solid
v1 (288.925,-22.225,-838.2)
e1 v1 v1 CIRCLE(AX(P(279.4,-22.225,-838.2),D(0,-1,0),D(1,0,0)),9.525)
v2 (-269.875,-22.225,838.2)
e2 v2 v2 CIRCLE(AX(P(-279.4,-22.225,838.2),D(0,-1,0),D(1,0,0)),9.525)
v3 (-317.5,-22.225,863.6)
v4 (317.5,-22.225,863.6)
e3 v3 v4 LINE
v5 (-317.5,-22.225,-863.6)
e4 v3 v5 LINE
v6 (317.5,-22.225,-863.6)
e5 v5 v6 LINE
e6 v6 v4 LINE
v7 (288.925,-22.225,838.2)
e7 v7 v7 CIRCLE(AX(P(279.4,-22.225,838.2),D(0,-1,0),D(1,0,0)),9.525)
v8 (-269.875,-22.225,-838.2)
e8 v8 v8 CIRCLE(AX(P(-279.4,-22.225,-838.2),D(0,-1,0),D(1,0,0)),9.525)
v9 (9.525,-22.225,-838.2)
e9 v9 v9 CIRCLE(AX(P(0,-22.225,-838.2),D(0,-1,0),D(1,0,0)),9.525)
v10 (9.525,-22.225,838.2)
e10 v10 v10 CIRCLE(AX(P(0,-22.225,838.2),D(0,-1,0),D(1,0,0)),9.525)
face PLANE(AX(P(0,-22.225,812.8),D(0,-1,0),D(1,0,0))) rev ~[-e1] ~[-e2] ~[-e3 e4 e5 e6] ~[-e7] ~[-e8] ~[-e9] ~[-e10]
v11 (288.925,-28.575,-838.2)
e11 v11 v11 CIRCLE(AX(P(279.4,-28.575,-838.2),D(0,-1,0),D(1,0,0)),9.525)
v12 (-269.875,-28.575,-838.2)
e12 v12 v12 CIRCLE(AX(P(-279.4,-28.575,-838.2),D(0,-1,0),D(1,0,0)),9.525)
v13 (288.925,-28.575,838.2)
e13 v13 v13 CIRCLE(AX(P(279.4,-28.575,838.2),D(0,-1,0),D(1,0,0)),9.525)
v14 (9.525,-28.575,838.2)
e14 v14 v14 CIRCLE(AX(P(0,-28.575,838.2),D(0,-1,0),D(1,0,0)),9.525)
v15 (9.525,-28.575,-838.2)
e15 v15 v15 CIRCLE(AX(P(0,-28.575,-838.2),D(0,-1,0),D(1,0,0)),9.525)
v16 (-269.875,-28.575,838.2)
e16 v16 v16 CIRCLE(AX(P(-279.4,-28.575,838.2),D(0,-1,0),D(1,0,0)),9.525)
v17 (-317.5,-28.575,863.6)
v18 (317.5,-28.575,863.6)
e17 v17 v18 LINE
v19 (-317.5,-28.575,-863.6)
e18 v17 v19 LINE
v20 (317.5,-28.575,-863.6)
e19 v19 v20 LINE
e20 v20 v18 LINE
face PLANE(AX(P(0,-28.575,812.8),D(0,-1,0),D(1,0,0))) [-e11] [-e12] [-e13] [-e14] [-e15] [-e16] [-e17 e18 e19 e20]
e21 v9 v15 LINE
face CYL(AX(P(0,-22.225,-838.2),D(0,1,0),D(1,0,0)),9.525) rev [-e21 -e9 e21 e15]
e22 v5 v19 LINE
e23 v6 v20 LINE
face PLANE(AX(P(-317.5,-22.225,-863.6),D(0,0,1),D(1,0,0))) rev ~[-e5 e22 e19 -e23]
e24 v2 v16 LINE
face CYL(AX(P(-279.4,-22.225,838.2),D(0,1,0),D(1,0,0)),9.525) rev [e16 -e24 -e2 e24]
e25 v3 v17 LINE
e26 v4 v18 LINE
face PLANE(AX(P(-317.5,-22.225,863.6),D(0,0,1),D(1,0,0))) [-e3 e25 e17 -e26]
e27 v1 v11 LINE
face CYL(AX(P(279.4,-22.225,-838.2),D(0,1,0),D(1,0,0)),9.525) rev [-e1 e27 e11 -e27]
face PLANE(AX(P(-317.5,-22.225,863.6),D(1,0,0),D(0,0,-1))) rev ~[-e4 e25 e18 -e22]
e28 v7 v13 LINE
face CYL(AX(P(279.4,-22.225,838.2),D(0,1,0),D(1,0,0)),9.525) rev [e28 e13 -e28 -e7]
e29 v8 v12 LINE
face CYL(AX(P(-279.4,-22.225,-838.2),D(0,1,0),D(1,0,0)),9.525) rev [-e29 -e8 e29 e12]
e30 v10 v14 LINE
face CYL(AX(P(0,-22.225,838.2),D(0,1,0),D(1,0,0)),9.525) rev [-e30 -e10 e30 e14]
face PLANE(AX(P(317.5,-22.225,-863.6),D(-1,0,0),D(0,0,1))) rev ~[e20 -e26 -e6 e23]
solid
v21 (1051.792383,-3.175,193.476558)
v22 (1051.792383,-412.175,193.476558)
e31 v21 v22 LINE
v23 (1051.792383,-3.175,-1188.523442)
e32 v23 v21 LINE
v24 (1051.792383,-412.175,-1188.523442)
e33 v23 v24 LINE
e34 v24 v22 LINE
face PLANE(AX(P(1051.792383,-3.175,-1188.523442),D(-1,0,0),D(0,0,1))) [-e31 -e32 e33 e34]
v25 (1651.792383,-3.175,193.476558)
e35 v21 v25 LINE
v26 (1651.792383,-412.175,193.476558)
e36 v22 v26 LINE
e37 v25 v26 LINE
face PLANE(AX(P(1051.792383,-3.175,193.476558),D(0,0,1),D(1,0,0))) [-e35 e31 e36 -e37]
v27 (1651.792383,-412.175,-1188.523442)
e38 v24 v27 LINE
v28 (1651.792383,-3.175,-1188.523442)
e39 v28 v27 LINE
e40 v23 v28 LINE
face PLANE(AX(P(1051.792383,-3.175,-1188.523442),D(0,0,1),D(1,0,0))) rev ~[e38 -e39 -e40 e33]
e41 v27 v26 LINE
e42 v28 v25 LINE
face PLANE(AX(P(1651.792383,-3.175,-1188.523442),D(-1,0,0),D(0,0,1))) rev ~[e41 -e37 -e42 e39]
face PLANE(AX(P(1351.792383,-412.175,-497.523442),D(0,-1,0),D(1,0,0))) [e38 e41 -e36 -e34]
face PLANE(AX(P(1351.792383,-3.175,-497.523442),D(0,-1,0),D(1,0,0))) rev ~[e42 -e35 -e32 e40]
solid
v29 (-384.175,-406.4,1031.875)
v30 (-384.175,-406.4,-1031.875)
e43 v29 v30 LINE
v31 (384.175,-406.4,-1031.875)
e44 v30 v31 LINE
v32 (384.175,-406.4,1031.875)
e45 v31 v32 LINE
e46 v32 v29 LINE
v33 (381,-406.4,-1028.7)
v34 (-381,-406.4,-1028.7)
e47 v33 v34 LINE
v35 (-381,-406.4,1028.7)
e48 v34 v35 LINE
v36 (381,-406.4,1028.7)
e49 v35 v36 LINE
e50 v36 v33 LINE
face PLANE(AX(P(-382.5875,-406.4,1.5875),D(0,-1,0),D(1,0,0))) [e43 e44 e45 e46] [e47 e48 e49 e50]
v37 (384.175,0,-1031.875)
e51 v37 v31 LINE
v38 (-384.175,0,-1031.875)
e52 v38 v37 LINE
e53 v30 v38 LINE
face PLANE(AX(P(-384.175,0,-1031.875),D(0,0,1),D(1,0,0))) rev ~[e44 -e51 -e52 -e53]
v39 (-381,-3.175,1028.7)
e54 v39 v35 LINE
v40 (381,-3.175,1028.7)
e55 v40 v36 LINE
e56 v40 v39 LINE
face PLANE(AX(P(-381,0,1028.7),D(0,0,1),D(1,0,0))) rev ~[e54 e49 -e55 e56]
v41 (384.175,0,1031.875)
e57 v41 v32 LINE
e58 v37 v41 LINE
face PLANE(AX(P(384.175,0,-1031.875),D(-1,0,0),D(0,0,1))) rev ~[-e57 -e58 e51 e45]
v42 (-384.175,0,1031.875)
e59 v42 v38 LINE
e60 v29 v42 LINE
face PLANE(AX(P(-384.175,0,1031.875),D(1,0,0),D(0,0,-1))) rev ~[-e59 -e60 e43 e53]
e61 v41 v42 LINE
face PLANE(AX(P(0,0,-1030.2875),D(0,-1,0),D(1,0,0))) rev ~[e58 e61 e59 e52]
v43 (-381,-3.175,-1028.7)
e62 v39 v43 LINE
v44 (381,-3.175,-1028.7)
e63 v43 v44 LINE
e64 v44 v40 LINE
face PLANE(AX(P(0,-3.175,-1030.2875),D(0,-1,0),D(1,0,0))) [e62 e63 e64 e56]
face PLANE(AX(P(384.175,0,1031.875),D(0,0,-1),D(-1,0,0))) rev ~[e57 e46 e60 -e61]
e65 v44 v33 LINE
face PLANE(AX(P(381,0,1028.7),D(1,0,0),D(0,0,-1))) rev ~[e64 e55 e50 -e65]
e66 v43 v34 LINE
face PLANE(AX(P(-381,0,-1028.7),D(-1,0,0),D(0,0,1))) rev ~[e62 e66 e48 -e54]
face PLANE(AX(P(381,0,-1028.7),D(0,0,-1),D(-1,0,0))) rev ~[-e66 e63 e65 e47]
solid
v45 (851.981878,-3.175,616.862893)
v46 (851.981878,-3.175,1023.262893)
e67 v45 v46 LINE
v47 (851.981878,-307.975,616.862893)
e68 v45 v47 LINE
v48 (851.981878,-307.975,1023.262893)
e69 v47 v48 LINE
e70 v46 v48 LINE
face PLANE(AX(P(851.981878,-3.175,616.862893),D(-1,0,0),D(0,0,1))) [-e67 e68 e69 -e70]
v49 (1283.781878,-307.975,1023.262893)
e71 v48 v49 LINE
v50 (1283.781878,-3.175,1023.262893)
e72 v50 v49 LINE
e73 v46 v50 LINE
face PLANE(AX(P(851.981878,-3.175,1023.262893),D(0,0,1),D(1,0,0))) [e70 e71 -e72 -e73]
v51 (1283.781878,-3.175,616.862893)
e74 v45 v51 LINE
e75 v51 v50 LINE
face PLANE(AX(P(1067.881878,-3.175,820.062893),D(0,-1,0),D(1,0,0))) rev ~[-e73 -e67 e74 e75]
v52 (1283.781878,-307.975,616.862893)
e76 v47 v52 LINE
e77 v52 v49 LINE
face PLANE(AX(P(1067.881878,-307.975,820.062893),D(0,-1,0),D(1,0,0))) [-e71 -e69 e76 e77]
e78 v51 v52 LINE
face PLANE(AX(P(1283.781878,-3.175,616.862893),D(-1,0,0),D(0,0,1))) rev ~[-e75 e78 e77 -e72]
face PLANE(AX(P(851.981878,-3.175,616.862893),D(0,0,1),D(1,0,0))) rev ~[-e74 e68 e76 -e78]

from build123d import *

# Parameters (mm, degrees)
F0_W     = 762
F0_H     = 3.175
F0_H_2   = 2057.4
F1_DEPTH = 3.175
F2_DEPTH = 406.4
F4_START = 19.05
F3_W     = 635
F3_H     = 101.6
F3_R     = 9.525
F3_H_2   = 1562.1
F3_H_3   = 63.5
F4_DEPTH = 6.35
F3_W_2   = 431.8
F3_H_4   = 406.4
F5_DEPTH = 304.8
F3_W_3   = 600
F3_H_5   = 1382
F6_DEPTH = 409


# Not quite as in the source:
# - a length typed as a fraction of an inch, garbled in the dataset ("3 / 203.2 mm" for 3/8 in), is restored


with BuildPart() as f1:
    # F0 (on Front) → F1 (new body)
    with BuildSketch(Plane.XZ):
        Polygon((381, -1028.7), (-381, -1028.7), (-384.175, -1028.7), (-384.175, -1031.875), (384.175, -1031.875), (384.175, -1028.7), align=None)
        Polygon((-381, -1028.7), (-381, 1028.7), (-381, 1031.875), (-384.175, 1031.875), (-384.175, -1028.7), align=None)
        Polygon((381, 1031.875), (381, 1028.7), (381, -1028.7), (384.175, -1028.7), (384.175, 1031.875), align=None)
        with Locations((0, 1030.2875)):
            Rectangle(F0_W, F0_H)
        Rectangle(F0_W, F0_H_2)
    extrude(amount=F1_DEPTH)

    # F0 (on Front) → F2 (join)
    with BuildSketch(Plane.XZ):
        Polygon((-381, -1028.7), (-381, 1028.7), (-381, 1031.875), (-384.175, 1031.875), (-384.175, -1028.7), align=None)
        with Locations((0, 1030.2875)):
            Rectangle(F0_W, F0_H)
        Polygon((381, 1031.875), (381, 1028.7), (381, -1028.7), (384.175, -1028.7), (384.175, 1031.875), align=None)
        Polygon((381, -1028.7), (-381, -1028.7), (-384.175, -1028.7), (-384.175, -1031.875), (384.175, -1031.875), (384.175, -1028.7), align=None)
    extrude(amount=F2_DEPTH)


with BuildPart() as f4:
    # F3 (on face) → F4 (new body)
    with BuildSketch(Plane.XZ.offset(3.175).offset(F4_START)):
        with Locations((0, 812.8)):
            Rectangle(F3_W, F3_H)
        with Locations((-279.4, 838.2)):
            Circle(F3_R, mode=Mode.SUBTRACT)
        with Locations((0, 838.2)):
            Circle(F3_R, mode=Mode.SUBTRACT)
        with Locations((279.4, 838.2)):
            Circle(F3_R, mode=Mode.SUBTRACT)
        with Locations((0, -19.05)):
            Rectangle(F3_W, F3_H_2)
        with Locations((0, -831.85)):
            Rectangle(F3_W, F3_H_3)
        with Locations((-279.4, -838.2)):
            Circle(F3_R, mode=Mode.SUBTRACT)
        with Locations((0, -838.2)):
            Circle(F3_R, mode=Mode.SUBTRACT)
        with Locations((279.4, -838.2)):
            Circle(F3_R, mode=Mode.SUBTRACT)
    extrude(amount=F4_DEPTH)


with BuildPart() as f5:
    # F3 (on face) → F5 (new body)
    with BuildSketch(Plane.XZ.offset(3.175)):
        with Locations((1067.8818782806, 820.0628931046)):
            Rectangle(F3_W_2, F3_H_4)
    extrude(amount=F5_DEPTH)


with BuildPart() as f6:
    # F3 (on face) → F6 (new body)
    with BuildSketch(Plane.XZ.offset(3.175)):
        with Locations((1351.792383194, -497.5234422684)):
            Rectangle(F3_W_3, F3_H_5)
    extrude(amount=F6_DEPTH)


solid = Compound([f1.part, f4.part, f5.part, f6.part])
